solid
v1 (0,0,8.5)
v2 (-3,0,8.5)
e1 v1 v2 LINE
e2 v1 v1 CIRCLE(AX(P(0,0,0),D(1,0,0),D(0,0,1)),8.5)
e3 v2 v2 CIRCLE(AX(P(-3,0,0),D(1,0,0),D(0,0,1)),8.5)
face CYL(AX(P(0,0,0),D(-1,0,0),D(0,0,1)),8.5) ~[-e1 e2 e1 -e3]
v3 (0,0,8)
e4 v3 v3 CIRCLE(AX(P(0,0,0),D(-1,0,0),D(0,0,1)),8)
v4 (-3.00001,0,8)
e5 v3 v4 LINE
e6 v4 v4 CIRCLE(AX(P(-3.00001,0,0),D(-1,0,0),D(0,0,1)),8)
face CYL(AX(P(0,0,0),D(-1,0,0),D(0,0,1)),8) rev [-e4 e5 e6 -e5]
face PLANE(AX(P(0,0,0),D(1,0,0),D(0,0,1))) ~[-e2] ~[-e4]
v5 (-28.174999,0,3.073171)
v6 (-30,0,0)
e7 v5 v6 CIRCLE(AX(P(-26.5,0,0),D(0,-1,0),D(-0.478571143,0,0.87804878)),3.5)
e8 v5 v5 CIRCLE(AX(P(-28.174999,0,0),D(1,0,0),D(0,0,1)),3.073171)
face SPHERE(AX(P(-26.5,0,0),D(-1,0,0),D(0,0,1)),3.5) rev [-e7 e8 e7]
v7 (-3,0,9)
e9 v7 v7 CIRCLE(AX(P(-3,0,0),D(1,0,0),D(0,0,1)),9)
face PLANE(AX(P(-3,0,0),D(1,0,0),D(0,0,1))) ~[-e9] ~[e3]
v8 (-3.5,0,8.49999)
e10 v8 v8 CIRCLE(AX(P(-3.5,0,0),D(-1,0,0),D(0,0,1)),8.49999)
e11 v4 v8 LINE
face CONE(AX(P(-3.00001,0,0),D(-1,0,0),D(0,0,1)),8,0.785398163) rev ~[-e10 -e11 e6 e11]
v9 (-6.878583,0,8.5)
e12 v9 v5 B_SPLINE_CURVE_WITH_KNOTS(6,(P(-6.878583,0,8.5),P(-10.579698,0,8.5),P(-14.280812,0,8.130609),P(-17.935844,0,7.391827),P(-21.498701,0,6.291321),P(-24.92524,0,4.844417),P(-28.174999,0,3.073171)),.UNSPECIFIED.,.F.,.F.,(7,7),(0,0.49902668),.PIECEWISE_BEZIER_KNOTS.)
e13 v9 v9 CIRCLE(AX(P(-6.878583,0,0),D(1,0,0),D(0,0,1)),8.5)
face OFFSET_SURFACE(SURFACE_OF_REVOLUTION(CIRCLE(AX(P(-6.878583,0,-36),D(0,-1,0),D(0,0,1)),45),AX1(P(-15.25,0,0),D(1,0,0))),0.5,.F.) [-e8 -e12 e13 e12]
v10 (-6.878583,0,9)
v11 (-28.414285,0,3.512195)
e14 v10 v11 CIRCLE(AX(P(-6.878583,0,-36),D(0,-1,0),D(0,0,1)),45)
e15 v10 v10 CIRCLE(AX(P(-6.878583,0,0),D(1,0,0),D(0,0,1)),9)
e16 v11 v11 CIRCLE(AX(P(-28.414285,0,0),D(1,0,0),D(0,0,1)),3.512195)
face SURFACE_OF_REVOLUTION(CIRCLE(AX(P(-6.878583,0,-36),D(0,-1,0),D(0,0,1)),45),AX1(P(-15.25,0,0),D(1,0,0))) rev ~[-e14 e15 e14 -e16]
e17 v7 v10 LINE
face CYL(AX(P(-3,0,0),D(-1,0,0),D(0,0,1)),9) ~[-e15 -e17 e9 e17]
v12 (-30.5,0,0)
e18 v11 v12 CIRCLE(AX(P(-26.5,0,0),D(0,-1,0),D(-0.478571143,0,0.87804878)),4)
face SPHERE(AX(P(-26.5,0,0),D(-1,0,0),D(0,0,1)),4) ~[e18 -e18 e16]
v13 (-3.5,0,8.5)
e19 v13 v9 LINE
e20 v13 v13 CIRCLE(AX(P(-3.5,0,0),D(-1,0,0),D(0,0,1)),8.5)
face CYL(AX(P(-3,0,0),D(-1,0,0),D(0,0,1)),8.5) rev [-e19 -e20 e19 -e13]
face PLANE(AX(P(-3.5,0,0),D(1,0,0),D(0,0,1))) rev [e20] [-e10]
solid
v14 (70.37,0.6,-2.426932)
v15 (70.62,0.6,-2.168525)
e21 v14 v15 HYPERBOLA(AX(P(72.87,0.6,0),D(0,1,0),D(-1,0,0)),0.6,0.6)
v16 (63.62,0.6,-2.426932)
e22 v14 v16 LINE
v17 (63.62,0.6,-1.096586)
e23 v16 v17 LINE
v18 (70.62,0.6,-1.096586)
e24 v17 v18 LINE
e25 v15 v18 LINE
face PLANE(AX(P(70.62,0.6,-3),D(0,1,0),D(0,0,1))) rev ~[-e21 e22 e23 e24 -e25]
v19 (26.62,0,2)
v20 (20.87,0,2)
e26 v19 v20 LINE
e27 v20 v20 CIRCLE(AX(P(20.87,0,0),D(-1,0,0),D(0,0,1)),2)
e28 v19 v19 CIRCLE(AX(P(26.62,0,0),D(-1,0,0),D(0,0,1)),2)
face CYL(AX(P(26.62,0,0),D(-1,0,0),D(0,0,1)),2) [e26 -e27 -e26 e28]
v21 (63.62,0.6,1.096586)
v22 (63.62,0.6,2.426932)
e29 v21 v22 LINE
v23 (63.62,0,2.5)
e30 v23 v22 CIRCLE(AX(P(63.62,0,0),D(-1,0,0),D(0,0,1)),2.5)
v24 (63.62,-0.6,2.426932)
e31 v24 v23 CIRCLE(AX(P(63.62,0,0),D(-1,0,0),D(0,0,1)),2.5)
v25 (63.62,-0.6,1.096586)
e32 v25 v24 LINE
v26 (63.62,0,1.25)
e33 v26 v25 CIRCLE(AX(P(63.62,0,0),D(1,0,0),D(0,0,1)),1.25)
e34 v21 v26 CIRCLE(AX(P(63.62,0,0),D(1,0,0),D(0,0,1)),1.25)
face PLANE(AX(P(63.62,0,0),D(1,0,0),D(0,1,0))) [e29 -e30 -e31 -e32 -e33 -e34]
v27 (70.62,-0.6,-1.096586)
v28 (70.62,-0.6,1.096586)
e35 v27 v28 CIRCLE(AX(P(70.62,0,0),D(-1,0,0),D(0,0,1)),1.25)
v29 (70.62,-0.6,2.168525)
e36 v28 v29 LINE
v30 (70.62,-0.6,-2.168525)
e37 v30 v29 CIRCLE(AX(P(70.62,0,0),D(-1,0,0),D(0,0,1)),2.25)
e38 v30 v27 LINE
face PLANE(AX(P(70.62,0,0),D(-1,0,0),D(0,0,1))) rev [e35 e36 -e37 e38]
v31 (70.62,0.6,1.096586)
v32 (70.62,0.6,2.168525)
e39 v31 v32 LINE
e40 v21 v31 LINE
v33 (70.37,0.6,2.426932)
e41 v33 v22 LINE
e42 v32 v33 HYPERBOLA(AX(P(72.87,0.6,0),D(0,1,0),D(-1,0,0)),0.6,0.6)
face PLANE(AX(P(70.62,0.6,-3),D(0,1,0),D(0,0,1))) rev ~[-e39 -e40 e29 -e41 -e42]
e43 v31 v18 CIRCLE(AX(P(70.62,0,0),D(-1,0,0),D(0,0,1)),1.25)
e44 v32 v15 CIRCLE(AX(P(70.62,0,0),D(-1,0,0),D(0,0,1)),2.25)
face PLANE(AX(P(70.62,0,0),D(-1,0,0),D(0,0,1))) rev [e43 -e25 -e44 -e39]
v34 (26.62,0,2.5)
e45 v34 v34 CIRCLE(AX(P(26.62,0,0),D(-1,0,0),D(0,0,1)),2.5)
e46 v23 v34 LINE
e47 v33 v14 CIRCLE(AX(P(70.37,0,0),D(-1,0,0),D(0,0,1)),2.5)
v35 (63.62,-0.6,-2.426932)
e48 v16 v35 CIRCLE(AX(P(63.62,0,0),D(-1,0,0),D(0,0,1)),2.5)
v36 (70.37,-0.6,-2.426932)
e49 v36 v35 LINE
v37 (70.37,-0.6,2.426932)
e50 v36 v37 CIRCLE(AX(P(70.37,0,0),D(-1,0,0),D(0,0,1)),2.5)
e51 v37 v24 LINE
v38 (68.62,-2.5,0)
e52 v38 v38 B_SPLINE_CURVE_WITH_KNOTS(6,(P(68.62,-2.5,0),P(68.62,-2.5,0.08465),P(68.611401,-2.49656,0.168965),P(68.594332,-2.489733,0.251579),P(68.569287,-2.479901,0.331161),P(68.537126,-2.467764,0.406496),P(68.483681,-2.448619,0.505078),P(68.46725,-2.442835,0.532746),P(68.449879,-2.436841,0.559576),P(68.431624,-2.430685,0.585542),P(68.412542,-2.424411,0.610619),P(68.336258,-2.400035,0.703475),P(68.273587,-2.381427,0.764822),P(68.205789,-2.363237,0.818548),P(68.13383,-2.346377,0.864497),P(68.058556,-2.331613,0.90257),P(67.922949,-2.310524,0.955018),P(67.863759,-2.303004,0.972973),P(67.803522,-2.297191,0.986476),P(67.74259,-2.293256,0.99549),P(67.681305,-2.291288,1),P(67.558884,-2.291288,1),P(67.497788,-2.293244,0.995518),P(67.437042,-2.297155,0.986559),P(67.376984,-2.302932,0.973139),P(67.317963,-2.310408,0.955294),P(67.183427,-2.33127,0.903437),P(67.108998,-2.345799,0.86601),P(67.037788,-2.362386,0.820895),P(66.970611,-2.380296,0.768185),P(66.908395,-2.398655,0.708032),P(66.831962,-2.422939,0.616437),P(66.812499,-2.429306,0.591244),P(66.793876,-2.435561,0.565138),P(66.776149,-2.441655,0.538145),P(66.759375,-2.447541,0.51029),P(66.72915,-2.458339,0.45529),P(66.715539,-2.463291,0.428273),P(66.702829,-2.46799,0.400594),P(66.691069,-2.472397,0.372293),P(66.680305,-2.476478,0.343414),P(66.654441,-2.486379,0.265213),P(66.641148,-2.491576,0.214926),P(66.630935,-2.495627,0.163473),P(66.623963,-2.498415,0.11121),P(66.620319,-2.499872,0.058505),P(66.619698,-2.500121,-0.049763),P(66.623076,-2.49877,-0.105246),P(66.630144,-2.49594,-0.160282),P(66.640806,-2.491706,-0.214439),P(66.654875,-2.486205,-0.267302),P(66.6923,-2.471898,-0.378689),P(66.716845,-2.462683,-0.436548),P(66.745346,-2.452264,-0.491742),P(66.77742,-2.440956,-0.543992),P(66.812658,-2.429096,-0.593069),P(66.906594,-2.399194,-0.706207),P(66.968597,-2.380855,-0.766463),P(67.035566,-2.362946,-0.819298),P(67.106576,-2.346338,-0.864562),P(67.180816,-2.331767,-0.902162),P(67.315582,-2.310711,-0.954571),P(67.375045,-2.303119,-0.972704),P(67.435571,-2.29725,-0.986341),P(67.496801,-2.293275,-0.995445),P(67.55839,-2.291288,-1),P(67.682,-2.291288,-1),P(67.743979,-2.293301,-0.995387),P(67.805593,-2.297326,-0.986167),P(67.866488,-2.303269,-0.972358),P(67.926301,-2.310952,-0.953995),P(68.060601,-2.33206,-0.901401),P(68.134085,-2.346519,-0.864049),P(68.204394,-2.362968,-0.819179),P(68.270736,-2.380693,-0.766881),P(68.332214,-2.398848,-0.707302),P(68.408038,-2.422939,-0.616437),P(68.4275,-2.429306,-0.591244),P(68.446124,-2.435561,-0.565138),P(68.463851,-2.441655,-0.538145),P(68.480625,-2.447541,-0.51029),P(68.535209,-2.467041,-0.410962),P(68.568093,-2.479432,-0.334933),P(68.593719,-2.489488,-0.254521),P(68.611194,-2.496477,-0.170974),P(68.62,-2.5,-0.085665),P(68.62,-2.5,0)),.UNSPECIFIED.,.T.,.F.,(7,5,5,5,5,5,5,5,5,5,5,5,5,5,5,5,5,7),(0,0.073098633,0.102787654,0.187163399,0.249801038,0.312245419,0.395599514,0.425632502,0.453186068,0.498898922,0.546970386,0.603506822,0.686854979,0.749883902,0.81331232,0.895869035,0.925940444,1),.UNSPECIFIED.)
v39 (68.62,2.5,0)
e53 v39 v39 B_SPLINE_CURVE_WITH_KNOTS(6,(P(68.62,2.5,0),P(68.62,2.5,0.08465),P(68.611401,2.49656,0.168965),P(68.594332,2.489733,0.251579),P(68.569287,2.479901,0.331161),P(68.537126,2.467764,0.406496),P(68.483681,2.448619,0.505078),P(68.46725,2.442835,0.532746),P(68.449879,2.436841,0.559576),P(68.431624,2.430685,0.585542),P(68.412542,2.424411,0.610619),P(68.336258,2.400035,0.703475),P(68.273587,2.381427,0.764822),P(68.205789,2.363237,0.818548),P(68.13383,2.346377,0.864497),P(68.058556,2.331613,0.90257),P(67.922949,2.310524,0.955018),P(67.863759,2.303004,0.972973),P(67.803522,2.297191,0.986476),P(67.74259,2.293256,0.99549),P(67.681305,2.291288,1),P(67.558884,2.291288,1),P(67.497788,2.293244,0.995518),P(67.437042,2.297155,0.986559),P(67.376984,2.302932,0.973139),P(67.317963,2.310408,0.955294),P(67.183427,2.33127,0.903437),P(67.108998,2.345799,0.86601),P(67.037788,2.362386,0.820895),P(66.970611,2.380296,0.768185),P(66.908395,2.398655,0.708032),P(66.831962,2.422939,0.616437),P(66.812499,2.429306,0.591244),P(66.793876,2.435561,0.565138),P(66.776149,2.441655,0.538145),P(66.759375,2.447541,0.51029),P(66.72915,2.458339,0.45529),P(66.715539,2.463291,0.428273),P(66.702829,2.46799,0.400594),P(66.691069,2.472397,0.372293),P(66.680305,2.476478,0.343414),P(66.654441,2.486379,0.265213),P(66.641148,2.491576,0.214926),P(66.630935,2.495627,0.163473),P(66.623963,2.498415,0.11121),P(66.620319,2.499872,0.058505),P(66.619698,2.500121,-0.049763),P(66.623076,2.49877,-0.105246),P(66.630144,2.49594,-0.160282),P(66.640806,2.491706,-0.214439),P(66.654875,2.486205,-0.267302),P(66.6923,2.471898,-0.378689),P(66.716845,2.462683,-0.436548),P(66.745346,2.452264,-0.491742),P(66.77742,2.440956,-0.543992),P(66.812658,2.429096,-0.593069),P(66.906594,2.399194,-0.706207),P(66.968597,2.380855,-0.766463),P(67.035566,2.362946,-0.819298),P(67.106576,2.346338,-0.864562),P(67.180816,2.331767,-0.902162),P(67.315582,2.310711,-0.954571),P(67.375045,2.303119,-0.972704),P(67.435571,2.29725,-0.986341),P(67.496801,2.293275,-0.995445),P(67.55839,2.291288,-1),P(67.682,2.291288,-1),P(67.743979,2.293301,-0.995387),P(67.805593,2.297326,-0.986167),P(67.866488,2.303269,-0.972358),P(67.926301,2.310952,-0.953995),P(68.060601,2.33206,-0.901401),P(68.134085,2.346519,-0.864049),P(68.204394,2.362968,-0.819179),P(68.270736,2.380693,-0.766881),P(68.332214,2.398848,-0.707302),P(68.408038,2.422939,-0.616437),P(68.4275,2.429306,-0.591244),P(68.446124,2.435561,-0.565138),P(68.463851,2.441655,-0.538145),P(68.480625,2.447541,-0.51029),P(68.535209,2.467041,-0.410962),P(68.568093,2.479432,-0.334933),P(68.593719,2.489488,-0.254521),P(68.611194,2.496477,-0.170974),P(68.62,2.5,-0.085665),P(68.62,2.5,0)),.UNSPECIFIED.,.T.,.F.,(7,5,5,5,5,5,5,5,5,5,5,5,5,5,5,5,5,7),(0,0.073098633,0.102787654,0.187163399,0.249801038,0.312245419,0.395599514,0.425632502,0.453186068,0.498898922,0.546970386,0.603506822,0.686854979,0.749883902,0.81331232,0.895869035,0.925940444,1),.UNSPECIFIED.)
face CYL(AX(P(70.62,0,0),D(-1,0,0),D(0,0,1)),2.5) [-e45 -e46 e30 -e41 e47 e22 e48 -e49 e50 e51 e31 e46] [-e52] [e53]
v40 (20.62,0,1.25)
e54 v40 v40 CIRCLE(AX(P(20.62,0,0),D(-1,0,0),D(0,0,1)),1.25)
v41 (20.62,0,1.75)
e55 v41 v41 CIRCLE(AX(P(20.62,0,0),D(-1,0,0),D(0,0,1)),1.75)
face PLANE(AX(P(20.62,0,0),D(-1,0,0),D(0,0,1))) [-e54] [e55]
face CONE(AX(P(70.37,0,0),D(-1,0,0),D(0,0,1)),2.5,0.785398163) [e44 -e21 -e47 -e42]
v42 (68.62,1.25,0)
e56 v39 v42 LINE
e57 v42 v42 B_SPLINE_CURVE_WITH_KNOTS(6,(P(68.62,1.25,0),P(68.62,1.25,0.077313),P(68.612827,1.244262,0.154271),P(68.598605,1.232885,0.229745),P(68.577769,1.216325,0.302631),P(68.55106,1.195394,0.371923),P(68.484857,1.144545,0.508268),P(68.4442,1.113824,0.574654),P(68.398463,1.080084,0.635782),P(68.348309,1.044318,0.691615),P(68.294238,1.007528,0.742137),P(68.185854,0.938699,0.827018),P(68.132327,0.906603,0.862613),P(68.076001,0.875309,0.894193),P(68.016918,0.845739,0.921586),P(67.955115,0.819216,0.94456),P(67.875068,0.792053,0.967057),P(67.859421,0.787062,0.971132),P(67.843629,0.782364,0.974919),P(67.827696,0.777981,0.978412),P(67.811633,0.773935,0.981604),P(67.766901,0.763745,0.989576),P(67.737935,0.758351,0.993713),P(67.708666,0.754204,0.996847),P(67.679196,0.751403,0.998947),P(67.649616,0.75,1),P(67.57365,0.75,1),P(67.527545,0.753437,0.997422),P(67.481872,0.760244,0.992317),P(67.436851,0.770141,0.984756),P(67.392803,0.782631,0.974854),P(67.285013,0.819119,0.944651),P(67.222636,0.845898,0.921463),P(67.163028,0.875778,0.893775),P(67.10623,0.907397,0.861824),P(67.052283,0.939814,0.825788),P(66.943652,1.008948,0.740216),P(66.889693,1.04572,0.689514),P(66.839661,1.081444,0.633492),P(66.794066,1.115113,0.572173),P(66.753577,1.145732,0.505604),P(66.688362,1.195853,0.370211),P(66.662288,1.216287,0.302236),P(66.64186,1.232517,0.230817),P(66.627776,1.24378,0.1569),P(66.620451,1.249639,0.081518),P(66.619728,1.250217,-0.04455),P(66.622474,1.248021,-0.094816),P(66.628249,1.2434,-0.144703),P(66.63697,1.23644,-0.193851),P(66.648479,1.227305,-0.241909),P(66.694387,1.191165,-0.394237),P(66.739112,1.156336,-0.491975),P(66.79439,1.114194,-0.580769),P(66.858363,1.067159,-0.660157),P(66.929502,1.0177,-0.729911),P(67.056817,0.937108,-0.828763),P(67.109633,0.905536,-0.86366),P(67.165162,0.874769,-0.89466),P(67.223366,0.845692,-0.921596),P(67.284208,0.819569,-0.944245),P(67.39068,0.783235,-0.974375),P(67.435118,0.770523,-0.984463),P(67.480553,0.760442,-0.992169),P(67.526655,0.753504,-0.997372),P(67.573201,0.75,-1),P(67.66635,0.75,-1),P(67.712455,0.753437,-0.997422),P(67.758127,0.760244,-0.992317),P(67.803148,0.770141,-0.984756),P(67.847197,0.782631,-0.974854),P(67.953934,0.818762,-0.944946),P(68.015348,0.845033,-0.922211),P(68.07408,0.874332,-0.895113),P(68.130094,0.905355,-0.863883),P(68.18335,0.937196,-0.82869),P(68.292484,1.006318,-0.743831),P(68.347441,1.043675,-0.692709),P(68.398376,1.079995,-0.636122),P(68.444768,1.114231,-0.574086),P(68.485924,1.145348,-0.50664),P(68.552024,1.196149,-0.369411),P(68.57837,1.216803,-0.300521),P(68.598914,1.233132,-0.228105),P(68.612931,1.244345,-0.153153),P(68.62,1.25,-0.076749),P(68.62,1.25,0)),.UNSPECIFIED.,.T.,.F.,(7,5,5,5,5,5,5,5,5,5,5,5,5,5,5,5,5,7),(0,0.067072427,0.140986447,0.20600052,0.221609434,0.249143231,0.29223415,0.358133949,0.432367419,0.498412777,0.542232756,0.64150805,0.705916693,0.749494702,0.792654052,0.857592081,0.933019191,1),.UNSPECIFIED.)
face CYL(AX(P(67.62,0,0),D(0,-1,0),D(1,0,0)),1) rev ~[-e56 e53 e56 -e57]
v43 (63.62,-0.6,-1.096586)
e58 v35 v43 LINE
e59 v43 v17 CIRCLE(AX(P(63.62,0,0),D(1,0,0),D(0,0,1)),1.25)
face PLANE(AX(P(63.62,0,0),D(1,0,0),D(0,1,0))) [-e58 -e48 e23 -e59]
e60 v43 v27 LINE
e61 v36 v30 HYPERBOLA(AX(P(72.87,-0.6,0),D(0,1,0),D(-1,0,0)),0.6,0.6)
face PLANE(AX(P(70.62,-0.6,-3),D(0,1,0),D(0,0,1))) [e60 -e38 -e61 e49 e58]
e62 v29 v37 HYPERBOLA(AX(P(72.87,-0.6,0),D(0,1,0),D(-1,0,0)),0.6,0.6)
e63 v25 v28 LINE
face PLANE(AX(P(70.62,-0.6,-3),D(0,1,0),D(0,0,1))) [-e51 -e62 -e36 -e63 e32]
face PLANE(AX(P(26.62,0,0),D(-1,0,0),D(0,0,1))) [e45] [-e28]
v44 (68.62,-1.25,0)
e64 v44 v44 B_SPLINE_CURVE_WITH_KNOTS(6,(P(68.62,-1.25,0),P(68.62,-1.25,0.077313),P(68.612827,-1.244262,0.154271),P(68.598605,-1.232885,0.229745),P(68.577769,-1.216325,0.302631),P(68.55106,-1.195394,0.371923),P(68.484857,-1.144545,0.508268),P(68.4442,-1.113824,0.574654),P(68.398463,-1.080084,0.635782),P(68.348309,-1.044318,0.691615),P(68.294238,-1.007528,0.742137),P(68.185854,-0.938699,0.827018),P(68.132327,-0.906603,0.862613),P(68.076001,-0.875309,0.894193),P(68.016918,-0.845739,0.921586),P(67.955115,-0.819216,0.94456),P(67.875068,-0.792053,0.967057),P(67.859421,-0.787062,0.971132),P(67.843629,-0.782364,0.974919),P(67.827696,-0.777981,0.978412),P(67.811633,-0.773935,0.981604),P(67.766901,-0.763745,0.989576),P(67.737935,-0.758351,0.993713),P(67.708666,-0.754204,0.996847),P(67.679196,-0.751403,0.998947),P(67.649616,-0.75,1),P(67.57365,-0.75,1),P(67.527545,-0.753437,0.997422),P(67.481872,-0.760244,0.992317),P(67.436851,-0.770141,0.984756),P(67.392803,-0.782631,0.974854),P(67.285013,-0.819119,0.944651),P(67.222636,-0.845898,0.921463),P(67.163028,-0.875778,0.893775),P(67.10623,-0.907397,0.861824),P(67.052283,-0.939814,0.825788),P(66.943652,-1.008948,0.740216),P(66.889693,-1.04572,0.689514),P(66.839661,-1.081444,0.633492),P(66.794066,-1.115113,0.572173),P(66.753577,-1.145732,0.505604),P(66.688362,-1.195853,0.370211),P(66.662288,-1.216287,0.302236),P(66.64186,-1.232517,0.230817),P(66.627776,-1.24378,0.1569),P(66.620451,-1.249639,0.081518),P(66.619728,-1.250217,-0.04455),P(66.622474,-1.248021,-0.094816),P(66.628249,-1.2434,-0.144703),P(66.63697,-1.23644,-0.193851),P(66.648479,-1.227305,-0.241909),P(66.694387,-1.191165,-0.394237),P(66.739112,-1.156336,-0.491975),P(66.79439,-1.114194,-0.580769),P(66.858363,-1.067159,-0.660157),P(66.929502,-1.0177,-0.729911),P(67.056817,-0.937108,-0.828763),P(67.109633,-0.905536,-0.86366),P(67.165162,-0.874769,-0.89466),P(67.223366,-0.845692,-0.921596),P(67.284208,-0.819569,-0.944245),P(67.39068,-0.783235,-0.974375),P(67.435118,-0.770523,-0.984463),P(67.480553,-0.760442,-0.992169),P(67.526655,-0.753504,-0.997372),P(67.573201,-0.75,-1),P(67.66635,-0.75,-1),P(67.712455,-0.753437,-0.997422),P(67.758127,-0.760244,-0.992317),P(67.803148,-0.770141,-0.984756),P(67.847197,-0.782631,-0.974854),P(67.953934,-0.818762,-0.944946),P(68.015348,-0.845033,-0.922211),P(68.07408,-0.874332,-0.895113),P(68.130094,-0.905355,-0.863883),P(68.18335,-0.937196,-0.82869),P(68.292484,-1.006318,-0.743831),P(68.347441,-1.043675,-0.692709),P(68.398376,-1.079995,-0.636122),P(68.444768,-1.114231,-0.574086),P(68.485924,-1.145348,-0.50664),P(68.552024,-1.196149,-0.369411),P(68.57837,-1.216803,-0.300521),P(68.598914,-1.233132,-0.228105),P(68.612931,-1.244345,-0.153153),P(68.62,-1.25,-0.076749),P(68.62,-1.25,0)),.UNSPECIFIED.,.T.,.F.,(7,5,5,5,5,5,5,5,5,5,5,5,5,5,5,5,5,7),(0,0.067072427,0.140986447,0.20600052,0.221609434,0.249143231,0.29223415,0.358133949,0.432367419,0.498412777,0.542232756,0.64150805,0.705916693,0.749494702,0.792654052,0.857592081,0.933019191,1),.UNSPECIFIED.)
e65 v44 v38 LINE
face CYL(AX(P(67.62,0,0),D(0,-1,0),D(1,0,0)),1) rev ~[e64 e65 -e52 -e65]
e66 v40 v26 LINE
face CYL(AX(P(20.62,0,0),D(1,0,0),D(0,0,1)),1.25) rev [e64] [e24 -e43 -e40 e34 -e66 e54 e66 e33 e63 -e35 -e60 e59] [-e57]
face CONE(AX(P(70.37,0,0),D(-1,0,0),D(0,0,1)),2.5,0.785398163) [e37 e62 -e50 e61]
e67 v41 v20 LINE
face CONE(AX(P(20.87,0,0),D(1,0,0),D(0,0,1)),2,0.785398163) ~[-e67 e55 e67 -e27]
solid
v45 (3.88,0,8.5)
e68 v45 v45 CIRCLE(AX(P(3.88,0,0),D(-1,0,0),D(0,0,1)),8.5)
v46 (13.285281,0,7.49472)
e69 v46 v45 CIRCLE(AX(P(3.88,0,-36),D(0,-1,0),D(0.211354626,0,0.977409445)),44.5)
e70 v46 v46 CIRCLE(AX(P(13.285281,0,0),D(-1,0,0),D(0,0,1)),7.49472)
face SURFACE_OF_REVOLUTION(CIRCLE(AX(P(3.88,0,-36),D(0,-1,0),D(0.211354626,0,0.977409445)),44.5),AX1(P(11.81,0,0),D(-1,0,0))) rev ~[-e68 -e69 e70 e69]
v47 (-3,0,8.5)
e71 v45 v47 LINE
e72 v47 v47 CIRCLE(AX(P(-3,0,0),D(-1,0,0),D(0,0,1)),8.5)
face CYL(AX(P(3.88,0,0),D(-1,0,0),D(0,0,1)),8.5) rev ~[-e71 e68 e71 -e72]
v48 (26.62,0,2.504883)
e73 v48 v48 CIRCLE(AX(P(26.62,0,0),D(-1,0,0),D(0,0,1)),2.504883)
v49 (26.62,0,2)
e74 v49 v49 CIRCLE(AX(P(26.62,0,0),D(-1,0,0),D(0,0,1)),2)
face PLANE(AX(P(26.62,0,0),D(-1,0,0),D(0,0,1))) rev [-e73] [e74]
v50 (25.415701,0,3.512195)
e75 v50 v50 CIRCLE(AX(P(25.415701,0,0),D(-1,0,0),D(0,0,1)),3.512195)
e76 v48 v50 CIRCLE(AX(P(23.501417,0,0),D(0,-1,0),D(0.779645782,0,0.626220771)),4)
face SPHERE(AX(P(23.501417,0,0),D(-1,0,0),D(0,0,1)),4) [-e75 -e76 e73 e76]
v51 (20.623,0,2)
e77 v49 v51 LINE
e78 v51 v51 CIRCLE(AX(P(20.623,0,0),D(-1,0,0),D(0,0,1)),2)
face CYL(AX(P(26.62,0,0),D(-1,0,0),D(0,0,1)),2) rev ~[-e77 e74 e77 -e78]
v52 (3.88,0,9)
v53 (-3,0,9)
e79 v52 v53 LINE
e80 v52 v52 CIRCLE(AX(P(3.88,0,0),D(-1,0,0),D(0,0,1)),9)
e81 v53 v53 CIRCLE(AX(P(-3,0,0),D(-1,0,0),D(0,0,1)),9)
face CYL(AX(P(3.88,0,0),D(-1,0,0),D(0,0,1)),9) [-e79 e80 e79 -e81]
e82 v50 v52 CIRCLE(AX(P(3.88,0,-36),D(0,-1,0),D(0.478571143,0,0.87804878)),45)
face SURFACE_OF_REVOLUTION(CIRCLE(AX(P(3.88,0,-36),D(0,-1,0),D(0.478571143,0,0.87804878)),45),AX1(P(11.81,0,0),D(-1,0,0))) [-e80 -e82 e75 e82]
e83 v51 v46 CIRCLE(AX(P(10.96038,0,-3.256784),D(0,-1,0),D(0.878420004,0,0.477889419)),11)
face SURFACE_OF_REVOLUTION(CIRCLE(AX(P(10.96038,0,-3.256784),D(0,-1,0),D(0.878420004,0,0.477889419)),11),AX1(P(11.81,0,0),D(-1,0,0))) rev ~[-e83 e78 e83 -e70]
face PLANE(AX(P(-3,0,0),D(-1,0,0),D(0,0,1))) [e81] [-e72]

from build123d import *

# Parameters (mm, degrees)
F2_T      = -0.5
F3_SIZE   = 0.49999
F10_SIZE  = 0.25
F11_R     = 1
F12_DEPTH = 12.5
F13_W     = 1.2
F13_H     = 6
F14_DEPTH = 7


# Not quite as in the source:
# - a fillet or chamfer is up to 0.001 mm smaller than in the source, because OpenCascade refuses the exact size


with BuildPart() as f1:
    # F0 (on Front) → F1 (revolve)
    with BuildSketch(Plane.XZ):
        with BuildLine():
            Line((-30.5, 0), (0, 0))
            Line((0, 0), (0, 8.5))
            Line((0, 8.5), (-3, 8.5))
            Line((-3, 8.5), (-3, 9))
            Line((-3, 9), (-6.8785831297, 9))
            ThreePointArc((-6.8785831297, 9), (-17.990541092, 7.6064718848), (-28.4142845727, 3.512195122))
            ThreePointArc((-28.4142845727, 3.512195122), (-29.9392686934, 2.0424081019), (-30.5, 0))
        make_face()
    revolve(axis=Axis((-15.25, 0, 0), (1, 0, 0)))

    # F2
    f2_openings = [f1.faces().sort_by_distance(p)[0] for p in [
        (0, 0, 0),
    ]]
    offset(amount=F2_T, openings=f2_openings, kind=Kind.INTERSECTION)

    # F3 (size 0.5 in the source; OpenCascade refuses exactly that, so slightly less here)
    f3_edges = [f1.edges().sort_by_distance(p)[0] for p in [
        (-3.5, 0, -8),
    ]]
    chamfer(f3_edges, length=F3_SIZE)


with BuildPart() as f6:
    # F4 (on Front) → F6 (revolve)
    with BuildSketch(Plane.XZ):
        with BuildLine():
            Line((-3, 9), (-3, 0))
            Line((-3, 0), (26.62, 0))
            Line((26.62, 0), (26.62, 2.5048830838))
            ThreePointArc((26.62, 2.5048830838), (26.0677583739, 3.0682065261), (25.4157014431, 3.512195122))
            ThreePointArc((25.4157014431, 3.512195122), (14.9919579623, 7.6064718848), (3.88, 9))
            Line((3.88, 9), (-3, 9))
        make_face()
    revolve(axis=Axis((11.81, 0, 0), (-1, 0, 0)))

    # F5 (on Front) → F7 (revolve, cut)
    with BuildSketch(Plane.XZ):
        with BuildLine():
            Line((-3, 8.5), (-3, 0))
            Line((-3, 0), (26.62, 0))
            Line((26.62, 0), (26.62, 2))
            Line((26.62, 2), (20.623, 2))
            ThreePointArc((20.623, 2), (17.5537972972, 5.5481495418), (13.2852808385, 7.4947202813))
            ThreePointArc((13.2852808385, 7.4947202813), (8.6094263649, 8.2479663517), (3.88, 8.5))
            Line((3.88, 8.5), (-3, 8.5))
        make_face()
    revolve(axis=Axis((11.81, 0, 0), (-1, 0, 0)), mode=Mode.SUBTRACT)


with BuildPart() as f9:
    # F8 (on Front) → F9 (revolve)
    with BuildSketch(Plane.XZ):
        Polygon((20.62, 2), (20.62, 1.25), (70.62, 1.25), (70.62, 2.5), (26.62, 2.5), (26.62, 2), align=None)
    revolve(axis=Axis((45.62, 0, 0), (-1, 0, 0)))

    # F10
    f10_edges = [f9.edges().sort_by_distance(p)[0] for p in [
        (20.62, 0, -2),
        (70.62, 0, -2.5),
    ]]
    chamfer(f10_edges, length=F10_SIZE)

    # F11 (on Front) → F12 (cut, symmetric)
    with BuildSketch(Plane.XZ):
        with Locations((67.62, 0)):
            Circle(F11_R)
    extrude(amount=F12_DEPTH, both=True, mode=Mode.SUBTRACT)

    # F13 (on face) → F14 (cut)
    with BuildSketch(Plane.YZ.offset(70.62)):
        Rectangle(F13_W, F13_H)
    extrude(amount=-F14_DEPTH, mode=Mode.SUBTRACT)


solid = Compound([f1.part, f6.part, f9.part])
